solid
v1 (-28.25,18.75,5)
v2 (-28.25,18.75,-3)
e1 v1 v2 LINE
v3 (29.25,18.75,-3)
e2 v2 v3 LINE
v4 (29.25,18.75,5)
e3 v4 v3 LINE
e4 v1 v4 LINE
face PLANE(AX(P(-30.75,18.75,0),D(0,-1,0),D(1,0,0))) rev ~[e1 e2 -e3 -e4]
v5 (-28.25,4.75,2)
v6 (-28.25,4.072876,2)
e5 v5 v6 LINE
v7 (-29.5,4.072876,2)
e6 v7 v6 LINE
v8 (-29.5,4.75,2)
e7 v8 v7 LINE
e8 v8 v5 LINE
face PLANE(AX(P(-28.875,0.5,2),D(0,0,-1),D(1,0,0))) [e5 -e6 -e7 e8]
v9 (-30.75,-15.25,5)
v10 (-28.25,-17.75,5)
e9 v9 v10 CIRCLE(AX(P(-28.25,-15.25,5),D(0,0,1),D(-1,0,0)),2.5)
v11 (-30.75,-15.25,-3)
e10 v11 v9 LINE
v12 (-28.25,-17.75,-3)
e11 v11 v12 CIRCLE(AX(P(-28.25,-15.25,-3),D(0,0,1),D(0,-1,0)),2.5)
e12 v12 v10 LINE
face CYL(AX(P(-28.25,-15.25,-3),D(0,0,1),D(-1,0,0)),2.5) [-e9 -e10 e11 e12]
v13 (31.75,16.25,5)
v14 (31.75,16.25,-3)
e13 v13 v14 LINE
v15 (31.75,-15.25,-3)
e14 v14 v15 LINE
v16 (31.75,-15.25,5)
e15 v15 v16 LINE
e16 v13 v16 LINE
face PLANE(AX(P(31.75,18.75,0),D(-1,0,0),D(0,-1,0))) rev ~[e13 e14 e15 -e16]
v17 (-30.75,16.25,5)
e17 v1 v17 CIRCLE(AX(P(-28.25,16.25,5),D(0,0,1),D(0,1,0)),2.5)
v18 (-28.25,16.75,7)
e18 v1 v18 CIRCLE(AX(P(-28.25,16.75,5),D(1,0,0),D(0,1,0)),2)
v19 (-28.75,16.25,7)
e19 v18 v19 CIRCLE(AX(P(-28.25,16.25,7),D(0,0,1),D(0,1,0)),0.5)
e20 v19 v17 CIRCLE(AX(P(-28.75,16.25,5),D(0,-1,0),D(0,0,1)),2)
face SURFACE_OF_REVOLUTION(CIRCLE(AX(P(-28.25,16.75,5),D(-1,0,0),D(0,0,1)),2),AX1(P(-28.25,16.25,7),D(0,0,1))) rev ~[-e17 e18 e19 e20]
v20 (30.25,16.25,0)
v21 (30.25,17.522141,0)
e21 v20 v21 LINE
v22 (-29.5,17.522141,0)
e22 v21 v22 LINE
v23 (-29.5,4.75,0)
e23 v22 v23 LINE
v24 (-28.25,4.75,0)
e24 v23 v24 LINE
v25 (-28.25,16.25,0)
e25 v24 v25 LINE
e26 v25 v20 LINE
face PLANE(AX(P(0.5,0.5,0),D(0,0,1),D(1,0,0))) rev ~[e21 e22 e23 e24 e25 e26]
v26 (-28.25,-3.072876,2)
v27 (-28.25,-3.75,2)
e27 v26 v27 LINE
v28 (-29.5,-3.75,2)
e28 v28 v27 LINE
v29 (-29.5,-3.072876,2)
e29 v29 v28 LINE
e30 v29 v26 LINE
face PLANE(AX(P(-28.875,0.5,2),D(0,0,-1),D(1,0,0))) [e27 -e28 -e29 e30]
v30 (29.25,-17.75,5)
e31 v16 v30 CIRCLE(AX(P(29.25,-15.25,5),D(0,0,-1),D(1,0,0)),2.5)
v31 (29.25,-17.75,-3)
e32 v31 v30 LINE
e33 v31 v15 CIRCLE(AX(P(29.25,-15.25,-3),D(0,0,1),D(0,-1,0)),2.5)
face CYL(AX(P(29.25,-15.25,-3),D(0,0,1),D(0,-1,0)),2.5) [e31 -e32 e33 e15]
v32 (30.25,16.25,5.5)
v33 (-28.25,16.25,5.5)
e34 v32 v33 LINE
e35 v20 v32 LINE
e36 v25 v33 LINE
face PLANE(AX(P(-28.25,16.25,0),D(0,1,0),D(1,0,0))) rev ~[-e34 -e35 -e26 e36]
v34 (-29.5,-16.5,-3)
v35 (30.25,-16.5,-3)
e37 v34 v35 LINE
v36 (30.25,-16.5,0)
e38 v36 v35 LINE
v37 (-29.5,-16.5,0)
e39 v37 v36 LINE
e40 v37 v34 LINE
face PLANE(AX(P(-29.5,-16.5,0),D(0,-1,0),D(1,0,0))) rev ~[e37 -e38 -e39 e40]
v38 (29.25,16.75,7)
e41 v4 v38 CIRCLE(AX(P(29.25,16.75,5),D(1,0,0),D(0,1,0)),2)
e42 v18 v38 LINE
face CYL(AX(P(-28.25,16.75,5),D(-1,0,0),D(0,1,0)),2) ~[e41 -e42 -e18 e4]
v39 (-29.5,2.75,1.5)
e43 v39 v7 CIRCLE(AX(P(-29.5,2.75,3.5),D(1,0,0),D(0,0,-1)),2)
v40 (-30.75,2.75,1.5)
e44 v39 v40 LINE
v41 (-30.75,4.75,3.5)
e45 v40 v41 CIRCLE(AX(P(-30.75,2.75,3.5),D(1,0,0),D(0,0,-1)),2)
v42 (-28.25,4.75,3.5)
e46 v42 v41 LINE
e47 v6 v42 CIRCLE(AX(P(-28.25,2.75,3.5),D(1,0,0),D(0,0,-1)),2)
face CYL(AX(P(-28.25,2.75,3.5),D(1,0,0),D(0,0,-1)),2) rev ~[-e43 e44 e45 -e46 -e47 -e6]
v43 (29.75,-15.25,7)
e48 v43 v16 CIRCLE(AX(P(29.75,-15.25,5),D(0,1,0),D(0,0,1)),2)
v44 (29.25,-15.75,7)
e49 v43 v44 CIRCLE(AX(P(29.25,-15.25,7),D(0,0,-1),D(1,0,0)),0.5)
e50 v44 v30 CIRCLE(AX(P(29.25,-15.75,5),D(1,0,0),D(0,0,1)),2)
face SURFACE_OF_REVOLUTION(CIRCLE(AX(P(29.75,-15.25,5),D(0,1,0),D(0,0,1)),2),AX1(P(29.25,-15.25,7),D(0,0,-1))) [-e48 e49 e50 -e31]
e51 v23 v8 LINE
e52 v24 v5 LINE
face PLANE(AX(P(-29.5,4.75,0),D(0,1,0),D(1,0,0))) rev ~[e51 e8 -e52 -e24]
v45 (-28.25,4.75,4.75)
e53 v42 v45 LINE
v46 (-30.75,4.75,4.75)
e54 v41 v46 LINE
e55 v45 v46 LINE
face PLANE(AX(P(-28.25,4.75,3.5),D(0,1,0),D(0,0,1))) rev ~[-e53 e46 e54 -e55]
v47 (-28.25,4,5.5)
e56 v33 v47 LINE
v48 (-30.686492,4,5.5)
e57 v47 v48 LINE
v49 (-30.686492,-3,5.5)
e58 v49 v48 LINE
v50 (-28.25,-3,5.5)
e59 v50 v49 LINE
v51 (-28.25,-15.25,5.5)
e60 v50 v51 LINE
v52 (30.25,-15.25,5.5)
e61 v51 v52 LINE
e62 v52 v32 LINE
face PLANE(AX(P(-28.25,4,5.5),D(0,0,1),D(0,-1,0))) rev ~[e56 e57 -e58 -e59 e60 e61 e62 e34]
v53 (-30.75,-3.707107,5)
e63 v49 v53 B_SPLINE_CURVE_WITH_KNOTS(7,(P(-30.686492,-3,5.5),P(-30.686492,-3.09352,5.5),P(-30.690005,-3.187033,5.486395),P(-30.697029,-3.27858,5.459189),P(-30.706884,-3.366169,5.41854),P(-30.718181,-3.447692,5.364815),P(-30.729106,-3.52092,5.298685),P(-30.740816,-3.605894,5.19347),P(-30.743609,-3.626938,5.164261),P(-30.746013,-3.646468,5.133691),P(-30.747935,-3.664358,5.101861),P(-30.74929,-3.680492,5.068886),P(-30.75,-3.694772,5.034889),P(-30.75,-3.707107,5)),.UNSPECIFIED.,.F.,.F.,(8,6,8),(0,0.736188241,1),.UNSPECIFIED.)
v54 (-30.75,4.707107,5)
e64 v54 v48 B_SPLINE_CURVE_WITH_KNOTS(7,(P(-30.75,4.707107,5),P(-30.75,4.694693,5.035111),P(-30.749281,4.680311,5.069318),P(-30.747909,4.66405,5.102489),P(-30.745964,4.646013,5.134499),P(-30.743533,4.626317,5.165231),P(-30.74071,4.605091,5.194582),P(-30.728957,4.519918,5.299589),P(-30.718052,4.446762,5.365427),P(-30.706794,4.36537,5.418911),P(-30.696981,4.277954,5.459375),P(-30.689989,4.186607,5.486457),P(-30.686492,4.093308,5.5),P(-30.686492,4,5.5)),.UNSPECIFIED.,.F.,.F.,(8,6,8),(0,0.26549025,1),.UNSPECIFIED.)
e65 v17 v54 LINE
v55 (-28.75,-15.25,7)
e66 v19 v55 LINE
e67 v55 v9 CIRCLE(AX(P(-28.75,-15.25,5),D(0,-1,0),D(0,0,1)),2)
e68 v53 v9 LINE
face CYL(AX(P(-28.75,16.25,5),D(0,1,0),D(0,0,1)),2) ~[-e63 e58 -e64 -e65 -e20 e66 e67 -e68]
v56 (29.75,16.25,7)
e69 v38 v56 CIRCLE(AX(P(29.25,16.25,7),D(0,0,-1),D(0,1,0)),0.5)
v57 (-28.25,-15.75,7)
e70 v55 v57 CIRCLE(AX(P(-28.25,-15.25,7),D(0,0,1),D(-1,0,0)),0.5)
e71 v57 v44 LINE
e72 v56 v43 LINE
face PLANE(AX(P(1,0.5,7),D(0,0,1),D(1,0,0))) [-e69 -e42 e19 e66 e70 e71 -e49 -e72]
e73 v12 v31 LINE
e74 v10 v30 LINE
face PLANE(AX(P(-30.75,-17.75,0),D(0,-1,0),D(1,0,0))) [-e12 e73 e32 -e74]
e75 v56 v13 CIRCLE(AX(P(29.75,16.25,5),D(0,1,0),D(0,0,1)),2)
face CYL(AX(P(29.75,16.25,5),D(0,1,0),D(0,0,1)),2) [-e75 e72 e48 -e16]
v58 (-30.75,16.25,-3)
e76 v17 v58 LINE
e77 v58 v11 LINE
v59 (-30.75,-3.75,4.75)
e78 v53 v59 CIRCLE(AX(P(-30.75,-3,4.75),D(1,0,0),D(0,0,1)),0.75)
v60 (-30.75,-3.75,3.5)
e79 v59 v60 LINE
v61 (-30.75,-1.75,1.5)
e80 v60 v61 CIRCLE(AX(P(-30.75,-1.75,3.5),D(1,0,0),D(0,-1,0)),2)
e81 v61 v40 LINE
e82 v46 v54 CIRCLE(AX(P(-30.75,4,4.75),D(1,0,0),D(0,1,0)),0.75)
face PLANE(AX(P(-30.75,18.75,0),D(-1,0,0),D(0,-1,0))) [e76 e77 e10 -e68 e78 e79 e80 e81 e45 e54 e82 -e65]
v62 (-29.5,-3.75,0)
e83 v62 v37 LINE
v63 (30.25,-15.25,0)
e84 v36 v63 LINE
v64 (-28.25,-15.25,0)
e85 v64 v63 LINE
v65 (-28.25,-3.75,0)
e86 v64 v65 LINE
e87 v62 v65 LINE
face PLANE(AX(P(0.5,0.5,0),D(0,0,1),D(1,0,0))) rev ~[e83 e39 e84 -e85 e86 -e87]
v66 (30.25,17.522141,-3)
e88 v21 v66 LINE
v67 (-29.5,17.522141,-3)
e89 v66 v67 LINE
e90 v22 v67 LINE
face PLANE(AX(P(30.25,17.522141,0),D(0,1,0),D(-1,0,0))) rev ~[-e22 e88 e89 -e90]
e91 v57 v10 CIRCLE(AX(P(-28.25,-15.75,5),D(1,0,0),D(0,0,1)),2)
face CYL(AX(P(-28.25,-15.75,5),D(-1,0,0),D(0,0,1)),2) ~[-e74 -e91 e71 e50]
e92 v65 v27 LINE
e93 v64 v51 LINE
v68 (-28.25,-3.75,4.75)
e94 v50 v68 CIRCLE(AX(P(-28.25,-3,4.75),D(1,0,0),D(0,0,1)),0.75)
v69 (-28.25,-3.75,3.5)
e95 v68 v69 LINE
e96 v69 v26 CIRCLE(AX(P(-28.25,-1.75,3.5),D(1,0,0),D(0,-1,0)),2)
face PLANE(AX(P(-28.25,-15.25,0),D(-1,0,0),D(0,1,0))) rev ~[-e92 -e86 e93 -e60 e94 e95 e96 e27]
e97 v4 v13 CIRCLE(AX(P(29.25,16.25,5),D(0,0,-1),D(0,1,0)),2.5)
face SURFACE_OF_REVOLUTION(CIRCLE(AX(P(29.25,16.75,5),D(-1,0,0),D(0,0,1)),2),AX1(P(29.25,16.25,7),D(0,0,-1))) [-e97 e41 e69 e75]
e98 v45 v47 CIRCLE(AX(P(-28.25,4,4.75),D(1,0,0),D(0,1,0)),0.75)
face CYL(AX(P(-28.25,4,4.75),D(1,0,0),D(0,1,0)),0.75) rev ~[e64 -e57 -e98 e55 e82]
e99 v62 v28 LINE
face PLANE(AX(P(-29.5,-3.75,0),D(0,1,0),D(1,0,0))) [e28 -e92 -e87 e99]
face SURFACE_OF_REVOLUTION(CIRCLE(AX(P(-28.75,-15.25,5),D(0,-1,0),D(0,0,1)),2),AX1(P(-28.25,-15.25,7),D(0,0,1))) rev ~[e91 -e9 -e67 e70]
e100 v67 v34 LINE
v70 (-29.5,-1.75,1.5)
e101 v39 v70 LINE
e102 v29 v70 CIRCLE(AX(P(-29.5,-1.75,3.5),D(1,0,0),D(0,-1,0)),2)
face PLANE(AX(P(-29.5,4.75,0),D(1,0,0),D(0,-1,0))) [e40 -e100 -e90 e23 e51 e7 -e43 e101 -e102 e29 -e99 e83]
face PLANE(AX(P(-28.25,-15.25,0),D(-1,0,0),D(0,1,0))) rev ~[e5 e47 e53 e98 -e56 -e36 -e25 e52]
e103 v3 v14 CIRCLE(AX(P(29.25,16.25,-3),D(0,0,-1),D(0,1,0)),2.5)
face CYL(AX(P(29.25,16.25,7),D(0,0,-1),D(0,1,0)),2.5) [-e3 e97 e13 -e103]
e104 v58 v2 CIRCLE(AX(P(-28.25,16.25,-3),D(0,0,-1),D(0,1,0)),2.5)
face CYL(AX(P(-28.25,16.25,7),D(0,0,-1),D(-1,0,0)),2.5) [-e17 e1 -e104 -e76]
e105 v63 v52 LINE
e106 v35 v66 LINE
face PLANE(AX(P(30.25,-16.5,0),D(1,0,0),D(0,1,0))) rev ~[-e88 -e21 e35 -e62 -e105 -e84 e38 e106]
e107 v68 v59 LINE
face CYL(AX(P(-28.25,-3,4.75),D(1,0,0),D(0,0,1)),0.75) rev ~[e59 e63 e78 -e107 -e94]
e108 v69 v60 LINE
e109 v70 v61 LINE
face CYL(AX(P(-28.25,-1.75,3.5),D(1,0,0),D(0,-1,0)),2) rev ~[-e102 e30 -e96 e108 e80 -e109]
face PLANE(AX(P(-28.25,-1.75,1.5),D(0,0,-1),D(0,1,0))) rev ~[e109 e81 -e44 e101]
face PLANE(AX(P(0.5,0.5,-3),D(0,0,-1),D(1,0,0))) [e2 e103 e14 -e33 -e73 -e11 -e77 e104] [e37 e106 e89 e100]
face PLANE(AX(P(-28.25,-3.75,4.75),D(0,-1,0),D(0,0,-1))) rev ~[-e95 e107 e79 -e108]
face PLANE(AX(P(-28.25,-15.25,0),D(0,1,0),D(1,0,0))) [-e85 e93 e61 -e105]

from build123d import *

# Parameters (mm, degrees)
F0_W         = 62.5
F0_H         = 36.5
F0_W_2       = 58.5
F0_H_2       = 31.5
F1_DEPTH     = 7
F3_DEPTH     = 1.5
F4_W         = 62.5
F4_H         = 36.5
F5_DEPTH     = 3
F7_DEPTH     = 2.5
F8_R         = 2.5
F9_T1_DEPTH  = 57.5
F9_T3_DEPTH  = 31.5
F9_T6_ANGLE  = 90
F9_T8_ANGLE  = 90
F9_T10_ANGLE = 90
F9_T12_ANGLE = 90
F10_W        = 1.25
F10_H        = 8.5
F11_DEPTH    = 2


# Not quite as in the source:
# - a fillet or chamfer that OpenCascade refuses, or shapes differently, is made with other operations: its cross-section is extruded or revolved along the edge and cut away or added


with BuildPart() as f1:
    # F0 (on Top) → F1 (new body)
    with BuildSketch(Plane.XY):
        with Locations((0.5, 0.5)):
            Rectangle(F0_W, F0_H)
        with Locations((1, 0.5)):
            Rectangle(F0_W_2, F0_H_2, mode=Mode.SUBTRACT)
    extrude(amount=F1_DEPTH)

    # F2 (on face) → F3 (join)
    with BuildSketch(Plane.XY.offset(7)):
        Polygon((30.25, 16.25), (-28.25, 16.25), (-28.25, -15.25), (30.25, -15.25), (30.25, -6), (30.25, 7), align=None)
    extrude(amount=-F3_DEPTH)

    # F4 (on face) → F5 (join)
    with BuildSketch(Plane(origin=(0, 0, 0), x_dir=(1, 0, 0), z_dir=(0, 0, -1))):
        with Locations((0.5, -0.5)):
            Rectangle(F4_W, F4_H)
        Polygon((-29.5, -17.522141248), (-29.5, 16.5), (30.25, 16.5), (30.25, 15.25), (30.25, -16.25), (30.25, -17.522141248), align=None, mode=Mode.SUBTRACT)
    extrude(amount=F5_DEPTH)

    # F6 (on face) → F7 (cut)
    with BuildSketch(Plane.YZ.offset(-28.25)):
        with BuildLine():
            Line((4, 5.5), (-3, 5.5))
            ThreePointArc((-3, 5.5), (-3.5303300859, 5.2803300859), (-3.75, 4.75))
            Line((-3.75, 4.75), (-3.75, 3.5))
            ThreePointArc((-3.75, 3.5), (-3.1642135624, 2.0857864376), (-1.75, 1.5))
            Line((-1.75, 1.5), (2.75, 1.5))
            ThreePointArc((2.75, 1.5), (4.1642135624, 2.0857864376), (4.75, 3.5))
            Line((4.75, 3.5), (4.75, 4.75))
            ThreePointArc((4.75, 4.75), (4.5303300859, 5.2803300859), (4, 5.5))
        make_face()
    extrude(amount=-F7_DEPTH, mode=Mode.SUBTRACT)

    # F8
    f8_edges = [f1.edges().sort_by_distance(p)[0] for p in [
        (-30.75, 18.75, 2),
        (-30.75, -17.75, 2),
        (31.75, 18.75, 2),
        (31.75, -17.75, 2),
    ]]
    fillet(f8_edges, radius=F8_R)

    # F9: fillet of radius 2 on 8 edges, made by hand

    # F9_s2 → F9_t1 (cut)
    with BuildSketch(Plane.YZ.offset(-28.25)):
        with BuildLine():
            ThreePointArc((-15.75, 7), (-17.1642135624, 6.4142135624), (-17.75, 5))
            Line((-17.75, 5), (-17.75, 7))
            Line((-17.75, 7), (-15.75, 7))
        make_face()
        with BuildLine():
            ThreePointArc((18.75, 5), (18.1642135624, 6.4142135624), (16.75, 7))
            Line((16.75, 7), (18.75, 7))
            Line((18.75, 7), (18.75, 5))
        make_face()
    extrude(amount=F9_T1_DEPTH, mode=Mode.SUBTRACT)

    # F9_s4 → F9_t3 (cut)
    with BuildSketch(Plane.XZ.offset(-16.25)):
        with BuildLine():
            ThreePointArc((29.75, 7), (31.1642135624, 6.4142135624), (31.75, 5))
            Line((31.75, 5), (31.75, 7))
            Line((31.75, 7), (29.75, 7))
        make_face()
        with BuildLine():
            ThreePointArc((-28.75, 7), (-30.1642135624, 6.4142135624), (-30.75, 5))
            Line((-30.75, 5), (-30.75, 7))
            Line((-30.75, 7), (-28.75, 7))
        make_face()
    extrude(amount=F9_T3_DEPTH, mode=Mode.SUBTRACT)

    # F9_s5 → F9_t6 (revolve, cut)
    with BuildSketch(Plane.YZ.offset(29.25)):
        with BuildLine():
            ThreePointArc((16.75, 7), (18.1642135624, 6.4142135624), (18.75, 5))
            Line((18.75, 5), (18.75, 7))
            Line((18.75, 7), (16.75, 7))
        make_face()
    revolve(axis=Axis((29.25, 16.25, 7), (0, 0, -1)), revolution_arc=F9_T6_ANGLE, mode=Mode.SUBTRACT)

    # F9_s7 → F9_t8 (revolve, cut)
    with BuildSketch(Plane.YZ.offset(-28.25)):
        with BuildLine():
            ThreePointArc((16.75, 7), (18.1642135624, 6.4142135624), (18.75, 5))
            Line((18.75, 5), (18.75, 7))
            Line((18.75, 7), (16.75, 7))
        make_face()
    revolve(axis=Axis((-28.25, 16.25, 7), (0, 0, 1)), revolution_arc=F9_T8_ANGLE, mode=Mode.SUBTRACT)

    # F9_s9 → F9_t10 (revolve, cut)
    with BuildSketch(Plane.XZ.offset(15.25)):
        with BuildLine():
            ThreePointArc((29.75, 7), (31.1642135624, 6.4142135624), (31.75, 5))
            Line((31.75, 5), (31.75, 7))
            Line((31.75, 7), (29.75, 7))
        make_face()
    revolve(axis=Axis((29.25, -15.25, 7), (0, 0, -1)), revolution_arc=F9_T10_ANGLE, mode=Mode.SUBTRACT)

    # F9_s11 → F9_t12 (revolve, cut)
    with BuildSketch(Plane.XZ.offset(15.25)):
        with BuildLine():
            ThreePointArc((-28.75, 7), (-30.1642135624, 6.4142135624), (-30.75, 5))
            Line((-30.75, 5), (-30.75, 7))
            Line((-30.75, 7), (-28.75, 7))
        make_face()
    revolve(axis=Axis((-28.25, -15.25, 7), (0, 0, 1)), revolution_arc=F9_T12_ANGLE, mode=Mode.SUBTRACT)

    # F10 (on face) → F11 (cut)
    with BuildSketch(Plane(origin=(0, 0, 0), x_dir=(1, 0, 0), z_dir=(0, 0, -1))):
        with Locations((-28.875, -0.5)):
            Rectangle(F10_W, F10_H)
    extrude(amount=-F11_DEPTH, mode=Mode.SUBTRACT)


solid = f1.part
